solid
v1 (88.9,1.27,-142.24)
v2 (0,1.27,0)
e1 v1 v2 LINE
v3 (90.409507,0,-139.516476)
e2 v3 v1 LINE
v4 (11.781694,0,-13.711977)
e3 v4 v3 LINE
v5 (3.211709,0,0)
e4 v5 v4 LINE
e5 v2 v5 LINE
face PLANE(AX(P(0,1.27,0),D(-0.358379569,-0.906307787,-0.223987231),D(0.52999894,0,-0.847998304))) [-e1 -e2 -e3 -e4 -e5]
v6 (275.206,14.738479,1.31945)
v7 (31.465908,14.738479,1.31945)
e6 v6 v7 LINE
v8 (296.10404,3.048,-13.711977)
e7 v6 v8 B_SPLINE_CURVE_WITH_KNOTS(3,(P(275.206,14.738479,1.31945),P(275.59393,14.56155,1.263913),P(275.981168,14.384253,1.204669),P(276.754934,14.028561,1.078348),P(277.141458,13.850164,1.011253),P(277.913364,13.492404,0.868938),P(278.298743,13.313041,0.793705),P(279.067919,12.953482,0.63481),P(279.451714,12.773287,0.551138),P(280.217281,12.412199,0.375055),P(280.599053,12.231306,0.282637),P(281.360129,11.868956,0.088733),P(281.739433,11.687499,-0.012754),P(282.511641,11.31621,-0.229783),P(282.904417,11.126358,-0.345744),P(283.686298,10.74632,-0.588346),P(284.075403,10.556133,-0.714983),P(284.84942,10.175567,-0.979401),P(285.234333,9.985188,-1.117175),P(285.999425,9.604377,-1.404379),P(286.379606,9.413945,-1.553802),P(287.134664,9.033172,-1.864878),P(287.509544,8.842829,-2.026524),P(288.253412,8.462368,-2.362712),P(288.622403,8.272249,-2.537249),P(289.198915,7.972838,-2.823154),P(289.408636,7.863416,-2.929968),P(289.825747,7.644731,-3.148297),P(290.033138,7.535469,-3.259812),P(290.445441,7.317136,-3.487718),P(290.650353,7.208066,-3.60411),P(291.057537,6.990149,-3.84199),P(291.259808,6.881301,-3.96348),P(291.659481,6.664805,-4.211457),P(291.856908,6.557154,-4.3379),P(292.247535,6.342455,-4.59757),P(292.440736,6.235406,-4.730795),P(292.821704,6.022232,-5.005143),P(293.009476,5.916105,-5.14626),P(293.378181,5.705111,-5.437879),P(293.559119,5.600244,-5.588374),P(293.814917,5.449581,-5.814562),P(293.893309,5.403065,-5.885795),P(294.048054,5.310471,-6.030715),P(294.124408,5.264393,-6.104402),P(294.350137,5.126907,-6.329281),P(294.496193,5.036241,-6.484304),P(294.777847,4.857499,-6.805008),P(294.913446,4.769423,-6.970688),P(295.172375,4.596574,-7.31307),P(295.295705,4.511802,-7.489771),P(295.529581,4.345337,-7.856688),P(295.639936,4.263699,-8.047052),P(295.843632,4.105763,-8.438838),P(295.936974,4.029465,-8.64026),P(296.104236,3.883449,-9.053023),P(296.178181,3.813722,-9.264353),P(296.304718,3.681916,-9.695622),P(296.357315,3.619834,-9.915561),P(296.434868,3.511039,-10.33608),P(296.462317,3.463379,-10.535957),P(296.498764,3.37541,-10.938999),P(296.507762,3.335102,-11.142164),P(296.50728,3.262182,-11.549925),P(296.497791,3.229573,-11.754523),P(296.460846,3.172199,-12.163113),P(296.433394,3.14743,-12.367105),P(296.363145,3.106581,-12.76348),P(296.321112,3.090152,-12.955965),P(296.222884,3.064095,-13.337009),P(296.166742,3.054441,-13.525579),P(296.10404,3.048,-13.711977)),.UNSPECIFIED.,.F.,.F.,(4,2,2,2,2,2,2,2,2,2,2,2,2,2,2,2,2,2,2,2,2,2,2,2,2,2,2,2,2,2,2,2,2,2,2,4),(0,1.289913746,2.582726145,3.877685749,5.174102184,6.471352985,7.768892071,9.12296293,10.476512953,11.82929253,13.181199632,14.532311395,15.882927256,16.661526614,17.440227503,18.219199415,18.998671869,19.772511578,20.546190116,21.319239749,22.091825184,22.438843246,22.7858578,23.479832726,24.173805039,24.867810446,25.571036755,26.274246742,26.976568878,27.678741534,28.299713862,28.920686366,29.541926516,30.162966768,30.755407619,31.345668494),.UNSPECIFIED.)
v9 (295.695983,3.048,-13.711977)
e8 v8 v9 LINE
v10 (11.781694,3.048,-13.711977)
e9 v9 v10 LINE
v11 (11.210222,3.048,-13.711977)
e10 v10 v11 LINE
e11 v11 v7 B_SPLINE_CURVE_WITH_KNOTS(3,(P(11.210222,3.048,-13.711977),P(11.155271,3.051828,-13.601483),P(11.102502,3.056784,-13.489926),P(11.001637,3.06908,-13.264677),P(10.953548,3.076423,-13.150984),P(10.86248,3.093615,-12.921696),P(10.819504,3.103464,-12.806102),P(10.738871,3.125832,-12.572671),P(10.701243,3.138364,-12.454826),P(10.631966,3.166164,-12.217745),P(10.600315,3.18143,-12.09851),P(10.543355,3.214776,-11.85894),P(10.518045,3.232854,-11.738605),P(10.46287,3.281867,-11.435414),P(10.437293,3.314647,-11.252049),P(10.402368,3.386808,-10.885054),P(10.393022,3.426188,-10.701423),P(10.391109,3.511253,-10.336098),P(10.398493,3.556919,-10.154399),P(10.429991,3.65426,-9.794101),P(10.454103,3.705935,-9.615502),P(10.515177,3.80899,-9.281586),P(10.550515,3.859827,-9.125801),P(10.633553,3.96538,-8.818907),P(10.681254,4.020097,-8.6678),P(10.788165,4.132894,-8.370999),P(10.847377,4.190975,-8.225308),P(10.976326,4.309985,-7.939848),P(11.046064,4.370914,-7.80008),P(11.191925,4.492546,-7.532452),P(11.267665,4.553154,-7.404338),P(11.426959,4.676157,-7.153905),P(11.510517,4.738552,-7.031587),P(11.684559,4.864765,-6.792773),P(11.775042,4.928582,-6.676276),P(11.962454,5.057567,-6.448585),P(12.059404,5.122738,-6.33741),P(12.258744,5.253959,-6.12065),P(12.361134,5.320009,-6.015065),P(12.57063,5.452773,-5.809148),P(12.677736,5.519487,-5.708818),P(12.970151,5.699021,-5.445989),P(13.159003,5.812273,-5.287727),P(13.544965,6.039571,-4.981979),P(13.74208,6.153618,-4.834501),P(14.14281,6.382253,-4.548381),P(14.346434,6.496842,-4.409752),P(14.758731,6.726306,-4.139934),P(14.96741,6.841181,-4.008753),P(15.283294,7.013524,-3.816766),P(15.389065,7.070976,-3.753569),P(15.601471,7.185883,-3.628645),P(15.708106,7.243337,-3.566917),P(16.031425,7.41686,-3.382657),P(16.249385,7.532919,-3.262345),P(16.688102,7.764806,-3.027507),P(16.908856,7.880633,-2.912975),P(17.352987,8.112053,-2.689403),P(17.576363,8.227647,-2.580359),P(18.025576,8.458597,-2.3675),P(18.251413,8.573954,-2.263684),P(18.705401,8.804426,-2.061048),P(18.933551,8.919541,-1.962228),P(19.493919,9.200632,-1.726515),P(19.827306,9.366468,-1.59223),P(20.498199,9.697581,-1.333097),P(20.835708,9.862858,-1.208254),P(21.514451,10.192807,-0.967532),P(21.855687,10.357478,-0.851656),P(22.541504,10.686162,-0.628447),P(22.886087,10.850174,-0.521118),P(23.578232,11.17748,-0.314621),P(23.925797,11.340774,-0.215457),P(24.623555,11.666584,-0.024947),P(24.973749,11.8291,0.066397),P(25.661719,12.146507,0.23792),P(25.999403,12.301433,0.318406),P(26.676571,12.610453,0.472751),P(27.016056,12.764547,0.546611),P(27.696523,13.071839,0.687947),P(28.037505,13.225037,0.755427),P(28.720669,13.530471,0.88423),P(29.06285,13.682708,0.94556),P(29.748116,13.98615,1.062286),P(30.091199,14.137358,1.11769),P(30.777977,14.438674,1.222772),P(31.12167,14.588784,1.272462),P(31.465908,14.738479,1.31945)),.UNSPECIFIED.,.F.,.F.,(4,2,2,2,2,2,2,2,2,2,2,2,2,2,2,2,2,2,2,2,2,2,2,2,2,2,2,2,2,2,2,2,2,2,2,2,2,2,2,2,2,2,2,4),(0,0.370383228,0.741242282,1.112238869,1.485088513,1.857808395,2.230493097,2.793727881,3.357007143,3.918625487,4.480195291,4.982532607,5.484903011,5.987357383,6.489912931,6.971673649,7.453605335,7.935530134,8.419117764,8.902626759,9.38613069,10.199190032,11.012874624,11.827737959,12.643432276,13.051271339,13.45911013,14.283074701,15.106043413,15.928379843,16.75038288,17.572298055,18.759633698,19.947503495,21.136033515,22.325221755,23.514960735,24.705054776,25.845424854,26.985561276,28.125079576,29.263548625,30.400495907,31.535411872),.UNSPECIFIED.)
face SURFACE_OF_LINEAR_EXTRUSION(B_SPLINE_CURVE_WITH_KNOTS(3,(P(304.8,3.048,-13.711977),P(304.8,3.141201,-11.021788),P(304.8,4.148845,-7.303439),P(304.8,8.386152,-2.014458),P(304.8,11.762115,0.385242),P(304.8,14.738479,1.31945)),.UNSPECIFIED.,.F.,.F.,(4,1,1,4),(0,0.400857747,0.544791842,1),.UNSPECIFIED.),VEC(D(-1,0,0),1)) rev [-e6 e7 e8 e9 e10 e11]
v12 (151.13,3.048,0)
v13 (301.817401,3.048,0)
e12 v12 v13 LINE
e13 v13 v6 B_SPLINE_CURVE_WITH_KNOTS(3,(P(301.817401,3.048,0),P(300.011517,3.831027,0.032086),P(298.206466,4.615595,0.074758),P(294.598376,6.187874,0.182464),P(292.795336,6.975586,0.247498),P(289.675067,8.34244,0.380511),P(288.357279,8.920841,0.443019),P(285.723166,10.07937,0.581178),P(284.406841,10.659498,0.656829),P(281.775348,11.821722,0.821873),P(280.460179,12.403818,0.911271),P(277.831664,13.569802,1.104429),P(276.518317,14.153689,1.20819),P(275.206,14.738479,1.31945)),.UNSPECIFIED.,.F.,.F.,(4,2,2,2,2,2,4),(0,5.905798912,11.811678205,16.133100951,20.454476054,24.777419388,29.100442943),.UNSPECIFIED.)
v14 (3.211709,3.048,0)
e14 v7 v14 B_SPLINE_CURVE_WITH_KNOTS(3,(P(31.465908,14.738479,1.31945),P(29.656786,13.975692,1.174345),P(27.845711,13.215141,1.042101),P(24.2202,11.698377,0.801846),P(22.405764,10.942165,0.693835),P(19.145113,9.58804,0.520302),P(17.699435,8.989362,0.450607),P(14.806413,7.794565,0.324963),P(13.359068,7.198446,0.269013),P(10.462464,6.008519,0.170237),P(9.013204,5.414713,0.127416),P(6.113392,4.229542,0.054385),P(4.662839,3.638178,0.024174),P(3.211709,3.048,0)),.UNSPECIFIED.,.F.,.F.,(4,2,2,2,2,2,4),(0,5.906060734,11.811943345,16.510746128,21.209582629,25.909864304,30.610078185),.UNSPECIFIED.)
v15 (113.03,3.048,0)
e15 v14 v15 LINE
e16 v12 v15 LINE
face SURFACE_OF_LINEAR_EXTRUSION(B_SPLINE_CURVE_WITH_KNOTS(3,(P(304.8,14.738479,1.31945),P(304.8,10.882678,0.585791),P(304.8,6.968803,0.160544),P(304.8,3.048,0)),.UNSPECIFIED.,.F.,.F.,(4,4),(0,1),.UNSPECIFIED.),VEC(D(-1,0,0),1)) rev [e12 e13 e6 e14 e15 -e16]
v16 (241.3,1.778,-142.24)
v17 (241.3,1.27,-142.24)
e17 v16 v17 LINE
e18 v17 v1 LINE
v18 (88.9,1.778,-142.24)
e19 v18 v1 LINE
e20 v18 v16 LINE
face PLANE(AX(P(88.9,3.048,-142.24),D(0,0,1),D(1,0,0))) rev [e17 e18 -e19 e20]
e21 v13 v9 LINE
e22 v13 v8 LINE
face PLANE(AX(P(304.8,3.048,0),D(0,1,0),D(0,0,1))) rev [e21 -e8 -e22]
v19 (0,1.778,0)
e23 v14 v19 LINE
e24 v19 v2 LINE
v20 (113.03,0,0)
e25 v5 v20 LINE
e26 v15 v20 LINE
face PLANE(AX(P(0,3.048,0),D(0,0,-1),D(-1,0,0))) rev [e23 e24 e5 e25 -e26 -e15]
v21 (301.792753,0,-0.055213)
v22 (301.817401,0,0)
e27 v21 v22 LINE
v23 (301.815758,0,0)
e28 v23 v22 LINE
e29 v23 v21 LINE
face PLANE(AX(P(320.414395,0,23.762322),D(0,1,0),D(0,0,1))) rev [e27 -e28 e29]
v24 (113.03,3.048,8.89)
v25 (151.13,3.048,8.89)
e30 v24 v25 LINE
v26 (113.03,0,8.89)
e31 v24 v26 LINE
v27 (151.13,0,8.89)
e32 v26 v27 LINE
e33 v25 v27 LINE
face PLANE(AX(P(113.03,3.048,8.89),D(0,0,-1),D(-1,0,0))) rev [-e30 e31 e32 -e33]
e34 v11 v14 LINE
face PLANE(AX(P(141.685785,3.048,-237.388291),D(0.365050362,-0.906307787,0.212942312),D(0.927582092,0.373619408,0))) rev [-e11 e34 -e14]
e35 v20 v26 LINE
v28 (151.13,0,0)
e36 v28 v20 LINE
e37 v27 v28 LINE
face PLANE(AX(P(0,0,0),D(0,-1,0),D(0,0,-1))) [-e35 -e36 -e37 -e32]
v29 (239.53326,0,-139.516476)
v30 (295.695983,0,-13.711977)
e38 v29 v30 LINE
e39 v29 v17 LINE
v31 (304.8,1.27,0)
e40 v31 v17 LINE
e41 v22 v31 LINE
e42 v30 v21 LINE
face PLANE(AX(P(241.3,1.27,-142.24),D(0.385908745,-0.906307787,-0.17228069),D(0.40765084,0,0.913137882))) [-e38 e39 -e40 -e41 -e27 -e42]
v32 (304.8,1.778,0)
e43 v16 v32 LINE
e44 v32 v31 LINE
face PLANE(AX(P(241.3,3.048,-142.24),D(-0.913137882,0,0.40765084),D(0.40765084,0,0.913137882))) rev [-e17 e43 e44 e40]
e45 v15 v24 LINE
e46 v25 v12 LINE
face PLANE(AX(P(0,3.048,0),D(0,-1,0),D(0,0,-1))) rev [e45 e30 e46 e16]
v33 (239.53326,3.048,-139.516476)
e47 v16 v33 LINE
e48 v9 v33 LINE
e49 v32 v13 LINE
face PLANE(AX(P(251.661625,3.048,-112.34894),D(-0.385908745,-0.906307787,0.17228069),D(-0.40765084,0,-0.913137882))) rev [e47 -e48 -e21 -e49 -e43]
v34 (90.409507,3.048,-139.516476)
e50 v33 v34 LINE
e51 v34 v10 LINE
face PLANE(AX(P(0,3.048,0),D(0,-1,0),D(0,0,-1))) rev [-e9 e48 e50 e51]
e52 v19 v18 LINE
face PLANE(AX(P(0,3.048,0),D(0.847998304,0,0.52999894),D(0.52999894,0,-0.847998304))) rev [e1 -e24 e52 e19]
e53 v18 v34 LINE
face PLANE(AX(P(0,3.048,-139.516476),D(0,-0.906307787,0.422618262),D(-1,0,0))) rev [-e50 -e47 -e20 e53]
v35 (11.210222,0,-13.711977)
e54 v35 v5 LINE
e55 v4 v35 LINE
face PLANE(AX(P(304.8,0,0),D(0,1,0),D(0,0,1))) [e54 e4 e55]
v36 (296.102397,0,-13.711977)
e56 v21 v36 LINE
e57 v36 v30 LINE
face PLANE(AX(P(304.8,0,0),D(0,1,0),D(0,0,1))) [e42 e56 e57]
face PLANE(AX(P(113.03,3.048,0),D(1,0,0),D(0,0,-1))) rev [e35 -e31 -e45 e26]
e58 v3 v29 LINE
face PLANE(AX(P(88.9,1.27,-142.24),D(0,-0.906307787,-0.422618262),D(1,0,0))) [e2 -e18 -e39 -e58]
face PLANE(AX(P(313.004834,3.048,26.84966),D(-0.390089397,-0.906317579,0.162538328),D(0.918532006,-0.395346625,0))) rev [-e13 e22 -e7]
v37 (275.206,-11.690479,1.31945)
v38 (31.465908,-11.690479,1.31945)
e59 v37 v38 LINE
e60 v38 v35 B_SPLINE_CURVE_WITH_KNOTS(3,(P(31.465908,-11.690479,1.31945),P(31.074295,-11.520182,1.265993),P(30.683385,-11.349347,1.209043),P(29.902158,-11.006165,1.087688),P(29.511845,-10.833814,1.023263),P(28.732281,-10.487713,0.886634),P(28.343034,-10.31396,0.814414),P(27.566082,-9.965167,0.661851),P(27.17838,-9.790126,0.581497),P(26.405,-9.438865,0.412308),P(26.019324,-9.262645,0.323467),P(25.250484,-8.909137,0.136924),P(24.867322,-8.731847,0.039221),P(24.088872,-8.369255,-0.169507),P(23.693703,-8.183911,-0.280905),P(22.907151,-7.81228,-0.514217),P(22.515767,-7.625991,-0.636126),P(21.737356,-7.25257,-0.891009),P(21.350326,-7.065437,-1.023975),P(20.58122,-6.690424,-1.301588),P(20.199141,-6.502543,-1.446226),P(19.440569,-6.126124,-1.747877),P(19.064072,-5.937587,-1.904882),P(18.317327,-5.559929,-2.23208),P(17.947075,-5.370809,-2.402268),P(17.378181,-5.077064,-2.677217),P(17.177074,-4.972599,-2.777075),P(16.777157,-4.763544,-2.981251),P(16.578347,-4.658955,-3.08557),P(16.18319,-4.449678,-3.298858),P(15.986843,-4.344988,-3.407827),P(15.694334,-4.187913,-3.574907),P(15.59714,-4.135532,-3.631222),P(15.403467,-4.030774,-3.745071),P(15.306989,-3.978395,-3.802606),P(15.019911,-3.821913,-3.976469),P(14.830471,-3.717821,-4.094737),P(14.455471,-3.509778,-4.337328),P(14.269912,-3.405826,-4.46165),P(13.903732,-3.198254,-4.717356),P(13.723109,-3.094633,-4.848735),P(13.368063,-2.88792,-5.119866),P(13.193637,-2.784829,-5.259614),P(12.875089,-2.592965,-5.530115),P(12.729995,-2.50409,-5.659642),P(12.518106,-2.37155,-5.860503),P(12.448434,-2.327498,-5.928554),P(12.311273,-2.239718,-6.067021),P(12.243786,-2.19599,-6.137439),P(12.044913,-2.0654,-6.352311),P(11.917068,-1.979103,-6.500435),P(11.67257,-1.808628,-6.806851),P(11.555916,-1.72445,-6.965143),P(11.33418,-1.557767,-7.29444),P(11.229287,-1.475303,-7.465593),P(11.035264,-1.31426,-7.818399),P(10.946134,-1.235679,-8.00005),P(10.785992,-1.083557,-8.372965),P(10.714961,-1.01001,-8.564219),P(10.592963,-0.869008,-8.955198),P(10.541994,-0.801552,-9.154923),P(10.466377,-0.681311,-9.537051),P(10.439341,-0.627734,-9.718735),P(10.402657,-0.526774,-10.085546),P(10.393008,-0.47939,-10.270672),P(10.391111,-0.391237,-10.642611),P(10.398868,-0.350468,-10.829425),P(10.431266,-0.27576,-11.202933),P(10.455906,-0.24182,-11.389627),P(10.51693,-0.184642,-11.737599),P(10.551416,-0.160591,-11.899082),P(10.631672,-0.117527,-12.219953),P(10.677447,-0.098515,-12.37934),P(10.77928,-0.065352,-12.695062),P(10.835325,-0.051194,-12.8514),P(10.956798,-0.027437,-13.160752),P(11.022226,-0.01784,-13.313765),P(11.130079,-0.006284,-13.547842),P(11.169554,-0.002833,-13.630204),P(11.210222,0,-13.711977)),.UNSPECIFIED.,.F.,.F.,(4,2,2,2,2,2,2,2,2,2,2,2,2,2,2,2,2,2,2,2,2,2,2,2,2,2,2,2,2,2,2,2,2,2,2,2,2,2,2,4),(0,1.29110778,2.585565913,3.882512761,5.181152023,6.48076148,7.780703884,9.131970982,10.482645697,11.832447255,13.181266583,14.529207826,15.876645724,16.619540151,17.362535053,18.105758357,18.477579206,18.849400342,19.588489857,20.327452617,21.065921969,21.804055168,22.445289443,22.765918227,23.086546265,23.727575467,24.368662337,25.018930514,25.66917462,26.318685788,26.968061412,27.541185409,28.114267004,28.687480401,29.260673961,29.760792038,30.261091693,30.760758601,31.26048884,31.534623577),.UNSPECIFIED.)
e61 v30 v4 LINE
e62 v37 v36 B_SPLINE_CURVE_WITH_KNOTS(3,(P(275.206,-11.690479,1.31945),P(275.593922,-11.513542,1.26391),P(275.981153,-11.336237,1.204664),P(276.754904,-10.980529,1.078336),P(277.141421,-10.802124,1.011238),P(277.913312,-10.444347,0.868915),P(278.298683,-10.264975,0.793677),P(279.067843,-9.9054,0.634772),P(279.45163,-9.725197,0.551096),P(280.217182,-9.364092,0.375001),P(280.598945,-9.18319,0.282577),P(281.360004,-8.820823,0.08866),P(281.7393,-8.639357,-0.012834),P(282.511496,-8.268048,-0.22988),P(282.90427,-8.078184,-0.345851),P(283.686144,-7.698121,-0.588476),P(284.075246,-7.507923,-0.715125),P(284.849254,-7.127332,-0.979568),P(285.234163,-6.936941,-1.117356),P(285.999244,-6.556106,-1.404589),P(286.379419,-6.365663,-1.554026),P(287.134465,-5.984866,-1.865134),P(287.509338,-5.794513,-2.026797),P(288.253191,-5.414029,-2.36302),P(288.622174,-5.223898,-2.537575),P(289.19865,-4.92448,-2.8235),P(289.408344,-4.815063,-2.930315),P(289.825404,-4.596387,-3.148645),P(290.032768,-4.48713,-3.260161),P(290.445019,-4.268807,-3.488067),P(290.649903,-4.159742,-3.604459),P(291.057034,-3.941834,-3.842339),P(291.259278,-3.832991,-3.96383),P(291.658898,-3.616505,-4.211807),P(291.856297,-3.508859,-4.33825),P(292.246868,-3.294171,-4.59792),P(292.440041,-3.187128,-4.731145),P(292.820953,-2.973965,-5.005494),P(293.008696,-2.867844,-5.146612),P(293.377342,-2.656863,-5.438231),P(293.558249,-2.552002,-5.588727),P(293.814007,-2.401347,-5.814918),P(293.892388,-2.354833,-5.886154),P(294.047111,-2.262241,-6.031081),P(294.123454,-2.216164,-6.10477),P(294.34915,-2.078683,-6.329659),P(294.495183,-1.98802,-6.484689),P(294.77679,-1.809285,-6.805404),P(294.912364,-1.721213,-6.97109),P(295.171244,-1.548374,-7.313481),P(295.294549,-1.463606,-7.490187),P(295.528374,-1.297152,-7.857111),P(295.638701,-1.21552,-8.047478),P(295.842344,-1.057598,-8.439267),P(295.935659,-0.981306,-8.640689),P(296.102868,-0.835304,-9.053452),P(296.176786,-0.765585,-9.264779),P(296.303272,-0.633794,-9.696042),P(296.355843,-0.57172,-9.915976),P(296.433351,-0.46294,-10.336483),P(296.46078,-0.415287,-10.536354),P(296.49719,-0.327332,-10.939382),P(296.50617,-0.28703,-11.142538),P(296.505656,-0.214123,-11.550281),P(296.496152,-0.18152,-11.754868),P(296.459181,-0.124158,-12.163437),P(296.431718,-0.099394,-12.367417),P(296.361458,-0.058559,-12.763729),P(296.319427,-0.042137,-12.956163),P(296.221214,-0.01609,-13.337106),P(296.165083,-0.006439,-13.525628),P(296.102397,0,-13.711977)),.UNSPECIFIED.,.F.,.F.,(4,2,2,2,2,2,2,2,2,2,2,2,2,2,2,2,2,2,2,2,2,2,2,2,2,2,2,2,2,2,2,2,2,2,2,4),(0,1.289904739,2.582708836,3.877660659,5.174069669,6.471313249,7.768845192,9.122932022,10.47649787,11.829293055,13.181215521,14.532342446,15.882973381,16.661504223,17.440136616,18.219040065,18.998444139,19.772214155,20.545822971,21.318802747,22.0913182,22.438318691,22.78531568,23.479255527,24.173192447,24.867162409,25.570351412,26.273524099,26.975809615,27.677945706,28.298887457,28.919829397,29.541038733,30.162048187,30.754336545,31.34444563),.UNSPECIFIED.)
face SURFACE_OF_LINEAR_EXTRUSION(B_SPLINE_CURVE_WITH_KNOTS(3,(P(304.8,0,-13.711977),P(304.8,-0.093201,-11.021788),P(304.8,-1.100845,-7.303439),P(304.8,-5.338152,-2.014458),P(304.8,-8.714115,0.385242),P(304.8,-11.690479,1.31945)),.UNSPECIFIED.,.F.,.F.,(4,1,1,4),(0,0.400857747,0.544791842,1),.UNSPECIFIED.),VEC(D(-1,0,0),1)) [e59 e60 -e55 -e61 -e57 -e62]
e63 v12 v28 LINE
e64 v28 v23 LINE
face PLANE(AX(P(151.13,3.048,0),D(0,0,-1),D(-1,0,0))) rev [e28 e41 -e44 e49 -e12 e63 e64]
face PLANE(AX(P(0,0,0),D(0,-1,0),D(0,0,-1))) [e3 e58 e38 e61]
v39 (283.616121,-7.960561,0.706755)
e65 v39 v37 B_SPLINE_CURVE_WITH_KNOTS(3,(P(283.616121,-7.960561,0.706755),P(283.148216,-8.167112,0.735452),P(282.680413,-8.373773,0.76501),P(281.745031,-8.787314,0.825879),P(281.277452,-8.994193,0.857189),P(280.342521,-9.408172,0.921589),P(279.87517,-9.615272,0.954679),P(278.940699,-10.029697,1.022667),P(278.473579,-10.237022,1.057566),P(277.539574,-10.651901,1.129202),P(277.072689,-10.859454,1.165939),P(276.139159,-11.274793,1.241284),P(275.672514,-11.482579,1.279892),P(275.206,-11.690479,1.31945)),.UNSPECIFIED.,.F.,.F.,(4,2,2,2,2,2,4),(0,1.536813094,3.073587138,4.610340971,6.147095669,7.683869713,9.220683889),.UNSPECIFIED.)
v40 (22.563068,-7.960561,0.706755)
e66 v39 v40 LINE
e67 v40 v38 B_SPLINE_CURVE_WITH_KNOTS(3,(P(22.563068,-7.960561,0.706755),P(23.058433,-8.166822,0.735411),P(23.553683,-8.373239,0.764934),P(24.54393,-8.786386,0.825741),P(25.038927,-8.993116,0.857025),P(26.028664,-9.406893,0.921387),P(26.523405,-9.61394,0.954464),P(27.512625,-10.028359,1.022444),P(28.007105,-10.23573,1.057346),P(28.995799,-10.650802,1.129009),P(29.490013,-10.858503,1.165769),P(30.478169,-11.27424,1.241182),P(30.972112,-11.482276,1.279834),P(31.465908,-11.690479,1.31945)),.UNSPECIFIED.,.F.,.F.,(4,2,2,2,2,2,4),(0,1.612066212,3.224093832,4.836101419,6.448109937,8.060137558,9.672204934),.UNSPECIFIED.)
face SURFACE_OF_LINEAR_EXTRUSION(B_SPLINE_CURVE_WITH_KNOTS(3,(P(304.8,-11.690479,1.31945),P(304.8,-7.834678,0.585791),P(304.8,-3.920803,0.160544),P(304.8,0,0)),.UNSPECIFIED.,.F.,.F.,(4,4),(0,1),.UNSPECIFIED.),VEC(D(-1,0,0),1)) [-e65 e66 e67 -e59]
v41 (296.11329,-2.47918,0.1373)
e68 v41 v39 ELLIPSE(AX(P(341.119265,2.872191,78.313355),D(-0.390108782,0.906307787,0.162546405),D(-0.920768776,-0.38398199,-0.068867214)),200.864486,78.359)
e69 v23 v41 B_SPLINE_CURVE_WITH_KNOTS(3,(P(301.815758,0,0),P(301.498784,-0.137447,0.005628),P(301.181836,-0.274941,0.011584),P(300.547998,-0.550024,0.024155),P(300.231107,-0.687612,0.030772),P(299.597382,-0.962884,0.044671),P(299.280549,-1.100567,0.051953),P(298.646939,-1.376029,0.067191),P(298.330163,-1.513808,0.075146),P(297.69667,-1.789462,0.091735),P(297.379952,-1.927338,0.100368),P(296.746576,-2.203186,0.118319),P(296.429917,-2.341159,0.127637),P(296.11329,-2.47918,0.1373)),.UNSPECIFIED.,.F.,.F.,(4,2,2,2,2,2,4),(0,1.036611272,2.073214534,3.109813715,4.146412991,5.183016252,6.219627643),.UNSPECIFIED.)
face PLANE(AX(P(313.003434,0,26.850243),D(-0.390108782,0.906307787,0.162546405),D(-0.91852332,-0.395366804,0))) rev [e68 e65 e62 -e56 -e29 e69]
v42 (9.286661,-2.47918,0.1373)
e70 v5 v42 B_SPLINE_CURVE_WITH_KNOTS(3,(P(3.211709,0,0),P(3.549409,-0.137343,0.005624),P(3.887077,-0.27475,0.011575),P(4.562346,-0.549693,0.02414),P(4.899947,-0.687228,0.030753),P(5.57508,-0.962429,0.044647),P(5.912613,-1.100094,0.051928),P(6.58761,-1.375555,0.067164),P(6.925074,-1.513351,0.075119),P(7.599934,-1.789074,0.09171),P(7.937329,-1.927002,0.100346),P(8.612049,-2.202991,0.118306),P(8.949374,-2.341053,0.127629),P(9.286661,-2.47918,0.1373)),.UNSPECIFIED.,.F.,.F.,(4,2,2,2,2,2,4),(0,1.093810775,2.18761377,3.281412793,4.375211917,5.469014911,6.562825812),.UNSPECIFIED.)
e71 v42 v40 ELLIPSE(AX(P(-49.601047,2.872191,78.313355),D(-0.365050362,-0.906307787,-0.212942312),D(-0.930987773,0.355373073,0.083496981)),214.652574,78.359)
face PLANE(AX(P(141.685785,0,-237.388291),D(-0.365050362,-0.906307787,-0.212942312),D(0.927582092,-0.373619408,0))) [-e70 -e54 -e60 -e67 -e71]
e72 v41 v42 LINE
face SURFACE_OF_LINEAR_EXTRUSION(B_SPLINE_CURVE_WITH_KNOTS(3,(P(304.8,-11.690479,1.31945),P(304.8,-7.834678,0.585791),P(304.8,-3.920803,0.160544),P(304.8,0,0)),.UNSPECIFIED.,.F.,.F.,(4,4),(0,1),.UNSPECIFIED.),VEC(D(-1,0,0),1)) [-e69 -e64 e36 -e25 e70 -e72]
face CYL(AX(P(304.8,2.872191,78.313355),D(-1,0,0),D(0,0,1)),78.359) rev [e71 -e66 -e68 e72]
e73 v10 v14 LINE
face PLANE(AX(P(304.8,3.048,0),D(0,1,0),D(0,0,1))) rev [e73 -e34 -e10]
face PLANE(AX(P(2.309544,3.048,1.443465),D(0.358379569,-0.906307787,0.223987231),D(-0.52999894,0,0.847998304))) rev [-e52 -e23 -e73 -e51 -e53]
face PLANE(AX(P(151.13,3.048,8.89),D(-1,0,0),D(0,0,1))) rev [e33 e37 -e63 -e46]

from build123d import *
from OCP.BRepFilletAPI import BRepFilletAPI_MakeChamfer

# Parameters (mm, degrees)
BOSS_EXTRUDE1_DEPTH      = 3.048
CHAMFER1_SIZE            = 1.27
CHAMFER1_SIZE2           = 2.723523789
BOSS_EXTRUDE2_DEPTH      = 304.8
LEADING_SIDE_DEPTH       = 337.678601078
LEADING_SIDE_DEPTH_BACK  = 337.678601078
TRAILING_SIDE_DEPTH      = 254
TRAILING_SIDE_DEPTH_BACK = 27.94


# Read off the part's stored shape, not the designer's step: Boss-Extrude2
with BuildPart() as part:
    # Sketch1 → Boss-Extrude1 (new body)
    with BuildSketch(Plane(origin=(0, 0, 0), x_dir=(1, 0, 0), z_dir=(0, 1, 0))):
        Polygon((0, 0), (88.9, 142.24), (241.3, 142.24), (304.8, 0), (151.13, 0), (151.13, -8.89), (113.03, -8.89), (113.03, 0), align=None)
    extrude(amount=BOSS_EXTRUDE1_DEPTH)

    # Chamfer1: one chamfer whose edges measure the first distance from different faces: ONE call of the kernel's chamfer builder (chamfer() names one face for all edges)
    chamfer1_edges_1 = [part.edges().sort_by_distance(p)[0] for p in [
        (273.05, 3.048, -71.12),
        (273.05, 0, -71.12),
    ]]
    chamfer1_side_1 = [part.faces().sort_by_distance(p)[0] for p in [
        (273.05, 1.524, -71.12),
    ]]
    chamfer1_edges_2 = [part.edges().sort_by_distance(p)[0] for p in [
        (165.1, 3.048, -142.24),
        (165.1, 0, -142.24),
    ]]
    chamfer1_side_2 = [part.faces().sort_by_distance(p)[0] for p in [
        (165.1, 1.524, -142.24),
    ]]
    chamfer1_edges_3 = [part.edges().sort_by_distance(p)[0] for p in [
        (44.45, 3.048, -71.12),
        (44.45, 0, -71.12),
    ]]
    chamfer1_side_3 = [part.faces().sort_by_distance(p)[0] for p in [
        (44.45, 1.524, -71.12),
    ]]
    chamfer1 = BRepFilletAPI_MakeChamfer(part.part.solid().wrapped)
    for e in chamfer1_edges_1:
        chamfer1.Add(CHAMFER1_SIZE, CHAMFER1_SIZE2, e.wrapped, chamfer1_side_1[0].wrapped)  # the first distance lies on this face
    for e in chamfer1_edges_2:
        chamfer1.Add(CHAMFER1_SIZE, CHAMFER1_SIZE2, e.wrapped, chamfer1_side_2[0].wrapped)  # the first distance lies on this face
    for e in chamfer1_edges_3:
        chamfer1.Add(CHAMFER1_SIZE, CHAMFER1_SIZE2, e.wrapped, chamfer1_side_3[0].wrapped)  # the first distance lies on this face
    add(Compound.cast(chamfer1.Shape()), mode=Mode.REPLACE)

    # Boss-Extrude2 outline → Boss-Extrude2 (add)
    with BuildSketch(Plane(origin=(0, 0, 0), x_dir=(0, 0, -1), z_dir=(1, 0, 0))):
        with BuildLine():
            add(Edge.make_bspline(
                [(-1.319449565, -11.69047888), (-1.083912463, -10.452594474), (-0.880163154, -9.208724492), (-0.706755386, -7.960561287)],
                knots=[0, 0, 0, 0, 0.321044666, 0.321044666, 0.321044666, 0.321044666], degree=3))
            add(Edge.make_bspline(
                [(13.71197658, 0), (11.02178845, -0.093200554), (7.303438621, -1.100845461), (2.014457887, -5.338152095), (-0.385242208, -8.714114828), (-1.319449565, -11.69047888)],
                knots=[0, 0, 0, 0, 0.400857747, 0.544791842, 1, 1, 1, 1], degree=3))
            Line((13.71197658, 0), (0, 0))
            add(Edge.make_bspline(
                [(-0.137299539, -2.479180327), (-0.079487033, -1.653414855), (-0.033857167, -0.826861513), (0, 0)],
                knots=[0.789109162, 0.789109162, 0.789109162, 0.789109162, 1, 1, 1, 1], degree=3))
            ThreePointArc((-0.137299539, -2.479180327), (-0.3738253, -5.224878487), (-0.706755386, -7.960561287))
        make_face()
        with BuildLine():
            Line((0, 3.048), (13.71197658, 3.048))
            add(Edge.make_bspline(
                [(13.71197658, 3.048), (11.02178845, 3.141200554), (7.303438621, 4.148845461), (2.014457887, 8.386152095), (-0.385242208, 11.762114828), (-1.319449565, 14.73847888)],
                knots=[0, 0, 0, 0, 0.400857747, 0.544791842, 1, 1, 1, 1], degree=3))
            add(Edge.make_bspline(
                [(-1.319449565, 14.73847888), (-0.58579121, 10.882677695), (-0.160543563, 6.9688034), (0, 3.048)],
                knots=[0, 0, 0, 0, 1, 1, 1, 1], degree=3))
        make_face()
    extrude(amount=BOSS_EXTRUDE2_DEPTH)

    # Sketch4 → Leading Side (cut, two sides: drawn at the far end of the back side and taken through both)
    with BuildSketch(Plane(origin=(0, 0, 0), x_dir=(0, -1, 0), z_dir=(-0.5038644349256837, 0, 0.8637827453804698)).offset(-LEADING_SIDE_DEPTH_BACK)):
        Polygon((0, -7.461077899), (0, 2.774218822), (11.69047888, 27.844531684), (11.69047888, -6.284577832), align=None)
        Polygon((-14.73847888, 27.844531684), (-14.73847888, -6.284577832), (-3.048, -7.461077899), (-3.048, 2.774218822), align=None)
    extrude(amount=LEADING_SIDE_DEPTH + LEADING_SIDE_DEPTH_BACK, mode=Mode.SUBTRACT)

    # Sketch6 → Trailing Side (cut, two sides: drawn at the far end of the back side and taken through both)
    with BuildSketch(Plane(origin=(45.089267536, 0, 108.213523637), x_dir=(0, -1, 0), z_dir=(-0.384617560400187, 0, -0.9230760164969126)).offset(-TRAILING_SIDE_DEPTH_BACK)):
        Polygon((0, -286.627436809), (0, -278.59888787), (11.69047888, -253.528575007), (11.69047888, -287.965550571), align=None)
        Polygon((-14.73847888, -253.528575007), (-14.73847888, -287.965550571), (-3.048, -286.627436809), (-3.048, -278.600404574), align=None)
    extrude(amount=TRAILING_SIDE_DEPTH + TRAILING_SIDE_DEPTH_BACK, mode=Mode.SUBTRACT)


solid = part.part
